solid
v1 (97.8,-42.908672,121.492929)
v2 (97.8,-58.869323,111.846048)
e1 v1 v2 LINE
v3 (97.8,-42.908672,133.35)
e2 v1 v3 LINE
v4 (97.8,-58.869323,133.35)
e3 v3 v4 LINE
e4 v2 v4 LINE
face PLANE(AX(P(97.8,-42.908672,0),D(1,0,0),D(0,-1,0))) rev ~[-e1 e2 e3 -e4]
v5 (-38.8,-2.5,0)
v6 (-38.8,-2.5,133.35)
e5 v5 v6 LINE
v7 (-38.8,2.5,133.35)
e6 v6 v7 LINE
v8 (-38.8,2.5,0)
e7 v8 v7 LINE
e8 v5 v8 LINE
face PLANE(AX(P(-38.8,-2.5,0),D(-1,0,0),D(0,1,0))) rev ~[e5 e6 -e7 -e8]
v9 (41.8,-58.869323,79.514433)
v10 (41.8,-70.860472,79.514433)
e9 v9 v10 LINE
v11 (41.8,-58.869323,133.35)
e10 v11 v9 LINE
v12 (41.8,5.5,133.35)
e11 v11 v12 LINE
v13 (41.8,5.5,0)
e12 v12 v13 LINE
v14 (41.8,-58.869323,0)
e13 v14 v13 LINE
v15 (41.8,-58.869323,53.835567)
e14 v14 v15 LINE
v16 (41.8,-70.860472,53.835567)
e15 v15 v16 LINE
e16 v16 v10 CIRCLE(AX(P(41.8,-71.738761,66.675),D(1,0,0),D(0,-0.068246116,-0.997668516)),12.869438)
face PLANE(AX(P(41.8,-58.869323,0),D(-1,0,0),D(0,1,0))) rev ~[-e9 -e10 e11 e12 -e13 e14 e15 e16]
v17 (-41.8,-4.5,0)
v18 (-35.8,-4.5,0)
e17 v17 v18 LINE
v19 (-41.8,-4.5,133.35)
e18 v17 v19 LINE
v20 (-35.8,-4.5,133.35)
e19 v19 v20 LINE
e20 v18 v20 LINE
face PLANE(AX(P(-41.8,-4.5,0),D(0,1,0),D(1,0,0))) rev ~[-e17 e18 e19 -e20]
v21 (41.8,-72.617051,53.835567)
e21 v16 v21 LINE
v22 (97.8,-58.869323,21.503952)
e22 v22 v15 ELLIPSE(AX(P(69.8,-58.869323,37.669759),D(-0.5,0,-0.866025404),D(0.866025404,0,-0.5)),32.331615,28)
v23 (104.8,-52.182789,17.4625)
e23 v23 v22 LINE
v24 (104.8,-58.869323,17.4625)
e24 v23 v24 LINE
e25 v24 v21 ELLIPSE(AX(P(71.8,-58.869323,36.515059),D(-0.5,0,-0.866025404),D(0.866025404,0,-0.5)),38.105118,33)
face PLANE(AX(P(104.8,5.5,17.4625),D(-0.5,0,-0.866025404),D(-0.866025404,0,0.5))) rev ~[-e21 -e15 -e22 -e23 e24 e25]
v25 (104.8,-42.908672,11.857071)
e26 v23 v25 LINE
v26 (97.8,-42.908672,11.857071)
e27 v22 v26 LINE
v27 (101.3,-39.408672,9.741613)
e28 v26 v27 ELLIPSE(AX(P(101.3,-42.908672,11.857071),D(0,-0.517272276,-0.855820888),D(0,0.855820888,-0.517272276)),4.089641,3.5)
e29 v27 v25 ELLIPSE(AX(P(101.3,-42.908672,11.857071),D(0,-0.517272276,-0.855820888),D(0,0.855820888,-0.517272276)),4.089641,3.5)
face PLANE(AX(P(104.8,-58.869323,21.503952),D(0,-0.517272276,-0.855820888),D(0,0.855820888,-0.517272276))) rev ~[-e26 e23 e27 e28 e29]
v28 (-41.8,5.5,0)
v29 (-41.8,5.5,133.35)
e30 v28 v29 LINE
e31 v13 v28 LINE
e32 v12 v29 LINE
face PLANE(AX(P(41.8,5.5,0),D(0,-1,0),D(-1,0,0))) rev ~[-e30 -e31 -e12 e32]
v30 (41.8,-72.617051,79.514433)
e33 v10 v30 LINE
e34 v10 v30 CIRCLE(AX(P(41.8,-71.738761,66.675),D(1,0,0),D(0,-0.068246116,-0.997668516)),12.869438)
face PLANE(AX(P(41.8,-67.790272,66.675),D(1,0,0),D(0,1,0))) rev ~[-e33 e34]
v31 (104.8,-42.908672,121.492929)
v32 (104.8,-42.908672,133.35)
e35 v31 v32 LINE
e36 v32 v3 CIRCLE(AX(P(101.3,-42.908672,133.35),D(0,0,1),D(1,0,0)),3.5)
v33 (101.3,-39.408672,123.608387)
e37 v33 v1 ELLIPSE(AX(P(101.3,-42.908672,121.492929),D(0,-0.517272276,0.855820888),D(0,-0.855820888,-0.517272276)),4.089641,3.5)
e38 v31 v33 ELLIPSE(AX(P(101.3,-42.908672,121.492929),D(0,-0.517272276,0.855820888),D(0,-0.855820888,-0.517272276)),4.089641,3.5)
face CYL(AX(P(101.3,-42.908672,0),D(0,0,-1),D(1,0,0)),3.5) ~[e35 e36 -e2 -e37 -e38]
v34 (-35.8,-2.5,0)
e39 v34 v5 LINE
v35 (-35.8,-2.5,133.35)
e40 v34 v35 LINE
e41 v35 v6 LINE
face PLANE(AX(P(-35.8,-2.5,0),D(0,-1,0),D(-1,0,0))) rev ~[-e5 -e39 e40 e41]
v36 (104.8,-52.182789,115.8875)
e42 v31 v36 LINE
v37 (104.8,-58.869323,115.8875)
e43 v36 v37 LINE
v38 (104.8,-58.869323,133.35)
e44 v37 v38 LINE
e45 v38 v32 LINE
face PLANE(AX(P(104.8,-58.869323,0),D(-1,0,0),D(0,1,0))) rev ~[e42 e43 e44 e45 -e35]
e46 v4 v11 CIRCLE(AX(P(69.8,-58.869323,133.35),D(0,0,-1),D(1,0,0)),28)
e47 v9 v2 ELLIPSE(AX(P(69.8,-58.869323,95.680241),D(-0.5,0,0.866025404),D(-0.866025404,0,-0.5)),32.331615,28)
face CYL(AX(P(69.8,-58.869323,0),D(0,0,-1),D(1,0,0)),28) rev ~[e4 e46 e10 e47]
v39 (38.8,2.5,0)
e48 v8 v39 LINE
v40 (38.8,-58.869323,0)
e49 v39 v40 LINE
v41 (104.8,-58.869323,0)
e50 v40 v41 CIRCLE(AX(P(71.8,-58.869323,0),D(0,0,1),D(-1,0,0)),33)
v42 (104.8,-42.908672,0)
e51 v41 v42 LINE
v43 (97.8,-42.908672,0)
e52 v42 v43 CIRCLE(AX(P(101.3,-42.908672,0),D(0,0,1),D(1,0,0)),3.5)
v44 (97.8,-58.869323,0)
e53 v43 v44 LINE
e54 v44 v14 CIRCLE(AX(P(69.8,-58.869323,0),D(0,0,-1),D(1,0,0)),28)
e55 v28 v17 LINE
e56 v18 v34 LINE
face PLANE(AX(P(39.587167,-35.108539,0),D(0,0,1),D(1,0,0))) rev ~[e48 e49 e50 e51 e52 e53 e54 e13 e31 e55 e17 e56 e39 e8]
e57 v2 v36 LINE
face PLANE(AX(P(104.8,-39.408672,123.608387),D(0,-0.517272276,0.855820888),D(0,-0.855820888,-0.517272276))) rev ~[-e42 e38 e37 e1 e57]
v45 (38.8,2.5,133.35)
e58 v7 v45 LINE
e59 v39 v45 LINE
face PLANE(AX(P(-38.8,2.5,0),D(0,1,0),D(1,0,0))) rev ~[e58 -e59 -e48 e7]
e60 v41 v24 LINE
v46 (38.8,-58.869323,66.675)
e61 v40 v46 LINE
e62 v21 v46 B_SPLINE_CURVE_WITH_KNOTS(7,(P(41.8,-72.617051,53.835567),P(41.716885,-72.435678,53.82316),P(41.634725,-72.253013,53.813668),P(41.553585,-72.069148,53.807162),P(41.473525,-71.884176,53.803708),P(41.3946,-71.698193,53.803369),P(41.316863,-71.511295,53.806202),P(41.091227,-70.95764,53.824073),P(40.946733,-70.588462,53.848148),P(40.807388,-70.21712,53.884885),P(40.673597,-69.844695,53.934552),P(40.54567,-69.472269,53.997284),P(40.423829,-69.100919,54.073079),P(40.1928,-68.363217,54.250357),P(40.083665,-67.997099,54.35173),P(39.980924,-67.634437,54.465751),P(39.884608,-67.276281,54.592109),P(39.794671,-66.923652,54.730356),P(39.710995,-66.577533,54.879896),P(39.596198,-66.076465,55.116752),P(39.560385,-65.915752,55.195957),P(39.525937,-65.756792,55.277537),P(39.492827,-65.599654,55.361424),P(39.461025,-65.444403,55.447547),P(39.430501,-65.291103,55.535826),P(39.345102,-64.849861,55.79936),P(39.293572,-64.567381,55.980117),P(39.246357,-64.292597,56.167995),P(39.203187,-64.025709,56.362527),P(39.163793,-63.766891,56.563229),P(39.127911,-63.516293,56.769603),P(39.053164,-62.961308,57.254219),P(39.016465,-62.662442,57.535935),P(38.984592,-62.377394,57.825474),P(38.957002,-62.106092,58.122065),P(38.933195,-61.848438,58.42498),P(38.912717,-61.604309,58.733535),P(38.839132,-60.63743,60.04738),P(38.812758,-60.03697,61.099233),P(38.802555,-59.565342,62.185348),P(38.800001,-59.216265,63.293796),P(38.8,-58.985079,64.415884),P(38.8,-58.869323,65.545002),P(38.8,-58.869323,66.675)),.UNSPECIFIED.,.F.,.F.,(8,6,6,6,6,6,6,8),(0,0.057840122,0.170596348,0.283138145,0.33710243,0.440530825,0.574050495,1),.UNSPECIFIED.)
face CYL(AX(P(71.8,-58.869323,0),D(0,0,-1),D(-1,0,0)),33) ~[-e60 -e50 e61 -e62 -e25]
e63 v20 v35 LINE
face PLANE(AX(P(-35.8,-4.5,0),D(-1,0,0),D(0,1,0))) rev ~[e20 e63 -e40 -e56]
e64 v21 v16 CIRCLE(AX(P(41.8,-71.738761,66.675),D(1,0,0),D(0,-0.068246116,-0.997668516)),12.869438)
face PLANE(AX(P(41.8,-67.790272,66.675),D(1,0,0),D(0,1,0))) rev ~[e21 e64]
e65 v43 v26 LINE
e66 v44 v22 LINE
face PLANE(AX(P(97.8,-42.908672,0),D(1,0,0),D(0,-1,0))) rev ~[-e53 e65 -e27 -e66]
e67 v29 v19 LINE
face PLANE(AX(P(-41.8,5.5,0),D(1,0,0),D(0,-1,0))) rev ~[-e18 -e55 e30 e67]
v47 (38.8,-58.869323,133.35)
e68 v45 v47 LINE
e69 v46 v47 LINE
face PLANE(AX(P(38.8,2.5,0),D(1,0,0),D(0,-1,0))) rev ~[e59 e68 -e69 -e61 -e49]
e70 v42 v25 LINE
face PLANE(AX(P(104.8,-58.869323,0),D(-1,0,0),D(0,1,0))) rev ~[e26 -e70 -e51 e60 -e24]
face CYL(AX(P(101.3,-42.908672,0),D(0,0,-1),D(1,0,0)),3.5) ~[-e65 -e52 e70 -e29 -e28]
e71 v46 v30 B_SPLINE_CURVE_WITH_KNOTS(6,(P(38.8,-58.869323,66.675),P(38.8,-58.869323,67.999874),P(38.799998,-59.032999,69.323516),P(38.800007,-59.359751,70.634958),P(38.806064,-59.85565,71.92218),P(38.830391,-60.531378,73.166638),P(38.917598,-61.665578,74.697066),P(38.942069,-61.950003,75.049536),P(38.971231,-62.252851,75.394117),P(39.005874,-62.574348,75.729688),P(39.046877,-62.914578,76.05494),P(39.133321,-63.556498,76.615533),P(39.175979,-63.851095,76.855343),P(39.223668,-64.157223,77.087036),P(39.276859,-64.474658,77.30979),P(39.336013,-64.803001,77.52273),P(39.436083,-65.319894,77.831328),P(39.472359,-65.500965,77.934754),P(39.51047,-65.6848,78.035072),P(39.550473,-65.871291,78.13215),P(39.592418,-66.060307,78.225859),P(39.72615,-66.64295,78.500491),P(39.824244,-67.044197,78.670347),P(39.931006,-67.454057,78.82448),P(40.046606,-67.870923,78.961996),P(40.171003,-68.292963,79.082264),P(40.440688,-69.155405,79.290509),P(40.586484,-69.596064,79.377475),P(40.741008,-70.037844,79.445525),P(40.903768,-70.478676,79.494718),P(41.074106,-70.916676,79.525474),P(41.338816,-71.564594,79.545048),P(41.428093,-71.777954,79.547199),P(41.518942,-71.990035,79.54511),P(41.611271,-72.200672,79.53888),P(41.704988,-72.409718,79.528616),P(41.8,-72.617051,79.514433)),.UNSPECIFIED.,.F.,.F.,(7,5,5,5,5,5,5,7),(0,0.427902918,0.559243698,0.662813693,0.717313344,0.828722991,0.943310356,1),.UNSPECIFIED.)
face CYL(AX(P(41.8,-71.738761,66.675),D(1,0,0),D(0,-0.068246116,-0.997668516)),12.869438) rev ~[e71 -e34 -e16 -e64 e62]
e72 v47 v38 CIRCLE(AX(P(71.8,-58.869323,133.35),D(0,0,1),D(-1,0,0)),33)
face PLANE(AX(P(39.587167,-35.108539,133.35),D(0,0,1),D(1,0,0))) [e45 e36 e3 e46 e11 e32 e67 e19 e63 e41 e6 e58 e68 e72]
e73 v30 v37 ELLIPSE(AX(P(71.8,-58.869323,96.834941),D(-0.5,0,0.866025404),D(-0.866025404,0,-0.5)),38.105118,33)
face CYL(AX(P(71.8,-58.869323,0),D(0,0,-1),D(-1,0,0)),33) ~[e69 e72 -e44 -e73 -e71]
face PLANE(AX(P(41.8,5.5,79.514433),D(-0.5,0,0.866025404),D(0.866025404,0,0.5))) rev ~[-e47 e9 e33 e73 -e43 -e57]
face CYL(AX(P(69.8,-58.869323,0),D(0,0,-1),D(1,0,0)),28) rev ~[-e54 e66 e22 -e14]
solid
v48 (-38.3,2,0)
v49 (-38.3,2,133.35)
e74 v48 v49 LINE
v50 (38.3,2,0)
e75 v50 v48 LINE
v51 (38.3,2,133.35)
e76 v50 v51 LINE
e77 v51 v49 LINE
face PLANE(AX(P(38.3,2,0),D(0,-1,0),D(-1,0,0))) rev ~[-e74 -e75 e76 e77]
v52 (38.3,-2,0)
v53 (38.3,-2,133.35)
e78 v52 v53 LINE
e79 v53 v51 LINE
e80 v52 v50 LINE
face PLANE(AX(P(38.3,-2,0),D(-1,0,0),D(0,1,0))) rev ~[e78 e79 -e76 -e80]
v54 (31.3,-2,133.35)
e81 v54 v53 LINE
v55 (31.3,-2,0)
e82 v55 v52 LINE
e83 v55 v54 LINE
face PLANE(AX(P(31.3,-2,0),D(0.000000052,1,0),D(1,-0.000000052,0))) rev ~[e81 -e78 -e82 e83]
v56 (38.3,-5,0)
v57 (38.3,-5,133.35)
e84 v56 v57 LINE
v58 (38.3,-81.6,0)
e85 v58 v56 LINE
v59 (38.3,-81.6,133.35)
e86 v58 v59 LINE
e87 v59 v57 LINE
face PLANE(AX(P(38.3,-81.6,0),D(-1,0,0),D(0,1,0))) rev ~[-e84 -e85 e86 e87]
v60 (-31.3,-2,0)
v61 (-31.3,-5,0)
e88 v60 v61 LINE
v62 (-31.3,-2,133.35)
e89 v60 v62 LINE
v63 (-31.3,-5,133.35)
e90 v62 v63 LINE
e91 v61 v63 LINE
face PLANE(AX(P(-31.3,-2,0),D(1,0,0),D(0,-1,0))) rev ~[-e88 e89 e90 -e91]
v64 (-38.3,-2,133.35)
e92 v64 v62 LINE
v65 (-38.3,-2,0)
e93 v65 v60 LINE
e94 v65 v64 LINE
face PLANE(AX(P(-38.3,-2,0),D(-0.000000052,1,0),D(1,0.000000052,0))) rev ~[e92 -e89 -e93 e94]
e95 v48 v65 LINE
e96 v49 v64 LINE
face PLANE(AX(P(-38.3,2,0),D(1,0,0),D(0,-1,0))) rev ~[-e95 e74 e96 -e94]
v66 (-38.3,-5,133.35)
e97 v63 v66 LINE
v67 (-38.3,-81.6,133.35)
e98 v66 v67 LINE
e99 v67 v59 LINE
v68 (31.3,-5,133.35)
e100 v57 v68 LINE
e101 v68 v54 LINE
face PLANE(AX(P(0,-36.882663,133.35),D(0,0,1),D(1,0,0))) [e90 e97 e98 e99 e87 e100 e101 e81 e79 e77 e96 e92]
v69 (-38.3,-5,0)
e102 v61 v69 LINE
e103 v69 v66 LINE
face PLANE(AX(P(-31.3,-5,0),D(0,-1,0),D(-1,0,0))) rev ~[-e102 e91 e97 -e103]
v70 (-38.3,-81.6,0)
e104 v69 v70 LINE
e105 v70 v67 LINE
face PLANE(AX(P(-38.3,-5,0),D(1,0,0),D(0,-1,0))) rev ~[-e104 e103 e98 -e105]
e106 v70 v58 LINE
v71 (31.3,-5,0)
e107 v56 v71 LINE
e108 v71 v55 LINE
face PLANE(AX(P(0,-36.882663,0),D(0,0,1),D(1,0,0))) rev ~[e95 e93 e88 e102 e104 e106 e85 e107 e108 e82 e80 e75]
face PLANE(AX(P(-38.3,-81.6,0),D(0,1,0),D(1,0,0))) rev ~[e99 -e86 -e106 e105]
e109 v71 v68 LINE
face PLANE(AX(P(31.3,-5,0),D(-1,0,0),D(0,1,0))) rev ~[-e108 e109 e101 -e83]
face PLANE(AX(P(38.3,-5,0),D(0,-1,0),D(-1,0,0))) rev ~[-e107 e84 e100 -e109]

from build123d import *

# Parameters (mm, degrees)
F3_DEPTH = 133.35
F5_DEPTH = 97.3703234473
F7_DEPTH = 83.601
F9_DEPTH = 63


with BuildPart() as f3:
    # F1 (on Top) → F3 (new body)
    with BuildSketch(Plane.XY):
        Polygon((38.3, -2), (38.3, 2), (-38.3, 2), (-38.3, -2), (-31.3, -1.9999996343), (-31.3, -4.9999996343), (-38.3, -4.9999996343), (-38.3, -81.5999996343), (38.3, -81.5999996343), (38.3, -4.9999996343), (31.3, -4.9999996343), (31.3, -1.9999996343), align=None)
    extrude(amount=F3_DEPTH)


with BuildPart() as f3b:
    # F2 (on Top) → F3, piece 2 (new body)
    with BuildSketch(Plane.XY):
        with BuildLine():
            Line((-41.8, -4.4999996343), (-35.8, -4.4999996343))
            Line((-35.8, -4.4999996343), (-35.8, -2.5000000261))
            Line((-35.8, -2.5000000261), (-38.8, -2.5000000261))
            Line((-38.8, -2.5000000261), (-38.8, 2.5))
            Line((-38.8, 2.5), (38.8, 2.5))
            Line((38.8, 2.5), (38.8, -58.8693234473))
            ThreePointArc((38.8, -58.8693234473), (71.8, -91.8693234473), (104.8, -58.8693234473))
            Line((104.8, -58.8693234473), (104.8, -42.9086722434))
            ThreePointArc((104.8, -42.9086722434), (101.3, -39.4086722434), (97.8, -42.9086722434))
            Line((97.8, -42.9086722434), (97.8, -58.8693234473))
            ThreePointArc((97.8, -58.8693234473), (69.8, -86.8693234473), (41.8, -58.8693234473))
            Line((41.8, -58.8693234473), (41.8, 5.5))
            Line((41.8, 5.5), (-41.8, 5.5))
            Line((-41.8, 5.5), (-41.8, -4.4999996343))
        make_face()
    extrude(amount=F3_DEPTH)

    # F4 (on face) → F5 (cut, through all)
    with BuildSketch(Plane(origin=(0, 5.5, 0), x_dir=(-1, 0, 0), z_dir=(0, 1, 0))):
        Polygon((-41.8, 79.5144330411), (-104.8, 115.8875), (-104.8, 17.4625), (-41.8, 53.8355669589), align=None)
    extrude(amount=-F5_DEPTH, mode=Mode.SUBTRACT)

    # F6 (on face) → F7 (cut, through all)
    with BuildSketch(Plane.YZ.offset(41.8)):
        with BuildLine():
            Line((-72.6170505322, 79.5144330411), (-72.6170505322, 53.8355669589))
            ThreePointArc((-72.6170505322, 53.8355669589), (-58.8693234473, 66.675), (-72.6170505322, 79.5144330411))
        make_face()
    extrude(amount=-F7_DEPTH, mode=Mode.SUBTRACT)

    # F8 (on face) → F9 (cut, through all)
    with BuildSketch(Plane.YZ.offset(104.8)):
        Polygon((-39.4086722434, 113.8667740578), (-39.4086722434, 123.6083870289), (-58.8693234473, 111.8460481157), (-39.4086722434, 111.8460481157), align=None)
        Polygon((-58.8693234473, 21.5039518843), (-39.4086722434, 9.7416129711), (-39.4086722434, 19.4832259422), (-39.4086722434, 21.5039518843), align=None)
    extrude(amount=-F9_DEPTH, mode=Mode.SUBTRACT)


solid = Compound([f3.part, f3b.part])
